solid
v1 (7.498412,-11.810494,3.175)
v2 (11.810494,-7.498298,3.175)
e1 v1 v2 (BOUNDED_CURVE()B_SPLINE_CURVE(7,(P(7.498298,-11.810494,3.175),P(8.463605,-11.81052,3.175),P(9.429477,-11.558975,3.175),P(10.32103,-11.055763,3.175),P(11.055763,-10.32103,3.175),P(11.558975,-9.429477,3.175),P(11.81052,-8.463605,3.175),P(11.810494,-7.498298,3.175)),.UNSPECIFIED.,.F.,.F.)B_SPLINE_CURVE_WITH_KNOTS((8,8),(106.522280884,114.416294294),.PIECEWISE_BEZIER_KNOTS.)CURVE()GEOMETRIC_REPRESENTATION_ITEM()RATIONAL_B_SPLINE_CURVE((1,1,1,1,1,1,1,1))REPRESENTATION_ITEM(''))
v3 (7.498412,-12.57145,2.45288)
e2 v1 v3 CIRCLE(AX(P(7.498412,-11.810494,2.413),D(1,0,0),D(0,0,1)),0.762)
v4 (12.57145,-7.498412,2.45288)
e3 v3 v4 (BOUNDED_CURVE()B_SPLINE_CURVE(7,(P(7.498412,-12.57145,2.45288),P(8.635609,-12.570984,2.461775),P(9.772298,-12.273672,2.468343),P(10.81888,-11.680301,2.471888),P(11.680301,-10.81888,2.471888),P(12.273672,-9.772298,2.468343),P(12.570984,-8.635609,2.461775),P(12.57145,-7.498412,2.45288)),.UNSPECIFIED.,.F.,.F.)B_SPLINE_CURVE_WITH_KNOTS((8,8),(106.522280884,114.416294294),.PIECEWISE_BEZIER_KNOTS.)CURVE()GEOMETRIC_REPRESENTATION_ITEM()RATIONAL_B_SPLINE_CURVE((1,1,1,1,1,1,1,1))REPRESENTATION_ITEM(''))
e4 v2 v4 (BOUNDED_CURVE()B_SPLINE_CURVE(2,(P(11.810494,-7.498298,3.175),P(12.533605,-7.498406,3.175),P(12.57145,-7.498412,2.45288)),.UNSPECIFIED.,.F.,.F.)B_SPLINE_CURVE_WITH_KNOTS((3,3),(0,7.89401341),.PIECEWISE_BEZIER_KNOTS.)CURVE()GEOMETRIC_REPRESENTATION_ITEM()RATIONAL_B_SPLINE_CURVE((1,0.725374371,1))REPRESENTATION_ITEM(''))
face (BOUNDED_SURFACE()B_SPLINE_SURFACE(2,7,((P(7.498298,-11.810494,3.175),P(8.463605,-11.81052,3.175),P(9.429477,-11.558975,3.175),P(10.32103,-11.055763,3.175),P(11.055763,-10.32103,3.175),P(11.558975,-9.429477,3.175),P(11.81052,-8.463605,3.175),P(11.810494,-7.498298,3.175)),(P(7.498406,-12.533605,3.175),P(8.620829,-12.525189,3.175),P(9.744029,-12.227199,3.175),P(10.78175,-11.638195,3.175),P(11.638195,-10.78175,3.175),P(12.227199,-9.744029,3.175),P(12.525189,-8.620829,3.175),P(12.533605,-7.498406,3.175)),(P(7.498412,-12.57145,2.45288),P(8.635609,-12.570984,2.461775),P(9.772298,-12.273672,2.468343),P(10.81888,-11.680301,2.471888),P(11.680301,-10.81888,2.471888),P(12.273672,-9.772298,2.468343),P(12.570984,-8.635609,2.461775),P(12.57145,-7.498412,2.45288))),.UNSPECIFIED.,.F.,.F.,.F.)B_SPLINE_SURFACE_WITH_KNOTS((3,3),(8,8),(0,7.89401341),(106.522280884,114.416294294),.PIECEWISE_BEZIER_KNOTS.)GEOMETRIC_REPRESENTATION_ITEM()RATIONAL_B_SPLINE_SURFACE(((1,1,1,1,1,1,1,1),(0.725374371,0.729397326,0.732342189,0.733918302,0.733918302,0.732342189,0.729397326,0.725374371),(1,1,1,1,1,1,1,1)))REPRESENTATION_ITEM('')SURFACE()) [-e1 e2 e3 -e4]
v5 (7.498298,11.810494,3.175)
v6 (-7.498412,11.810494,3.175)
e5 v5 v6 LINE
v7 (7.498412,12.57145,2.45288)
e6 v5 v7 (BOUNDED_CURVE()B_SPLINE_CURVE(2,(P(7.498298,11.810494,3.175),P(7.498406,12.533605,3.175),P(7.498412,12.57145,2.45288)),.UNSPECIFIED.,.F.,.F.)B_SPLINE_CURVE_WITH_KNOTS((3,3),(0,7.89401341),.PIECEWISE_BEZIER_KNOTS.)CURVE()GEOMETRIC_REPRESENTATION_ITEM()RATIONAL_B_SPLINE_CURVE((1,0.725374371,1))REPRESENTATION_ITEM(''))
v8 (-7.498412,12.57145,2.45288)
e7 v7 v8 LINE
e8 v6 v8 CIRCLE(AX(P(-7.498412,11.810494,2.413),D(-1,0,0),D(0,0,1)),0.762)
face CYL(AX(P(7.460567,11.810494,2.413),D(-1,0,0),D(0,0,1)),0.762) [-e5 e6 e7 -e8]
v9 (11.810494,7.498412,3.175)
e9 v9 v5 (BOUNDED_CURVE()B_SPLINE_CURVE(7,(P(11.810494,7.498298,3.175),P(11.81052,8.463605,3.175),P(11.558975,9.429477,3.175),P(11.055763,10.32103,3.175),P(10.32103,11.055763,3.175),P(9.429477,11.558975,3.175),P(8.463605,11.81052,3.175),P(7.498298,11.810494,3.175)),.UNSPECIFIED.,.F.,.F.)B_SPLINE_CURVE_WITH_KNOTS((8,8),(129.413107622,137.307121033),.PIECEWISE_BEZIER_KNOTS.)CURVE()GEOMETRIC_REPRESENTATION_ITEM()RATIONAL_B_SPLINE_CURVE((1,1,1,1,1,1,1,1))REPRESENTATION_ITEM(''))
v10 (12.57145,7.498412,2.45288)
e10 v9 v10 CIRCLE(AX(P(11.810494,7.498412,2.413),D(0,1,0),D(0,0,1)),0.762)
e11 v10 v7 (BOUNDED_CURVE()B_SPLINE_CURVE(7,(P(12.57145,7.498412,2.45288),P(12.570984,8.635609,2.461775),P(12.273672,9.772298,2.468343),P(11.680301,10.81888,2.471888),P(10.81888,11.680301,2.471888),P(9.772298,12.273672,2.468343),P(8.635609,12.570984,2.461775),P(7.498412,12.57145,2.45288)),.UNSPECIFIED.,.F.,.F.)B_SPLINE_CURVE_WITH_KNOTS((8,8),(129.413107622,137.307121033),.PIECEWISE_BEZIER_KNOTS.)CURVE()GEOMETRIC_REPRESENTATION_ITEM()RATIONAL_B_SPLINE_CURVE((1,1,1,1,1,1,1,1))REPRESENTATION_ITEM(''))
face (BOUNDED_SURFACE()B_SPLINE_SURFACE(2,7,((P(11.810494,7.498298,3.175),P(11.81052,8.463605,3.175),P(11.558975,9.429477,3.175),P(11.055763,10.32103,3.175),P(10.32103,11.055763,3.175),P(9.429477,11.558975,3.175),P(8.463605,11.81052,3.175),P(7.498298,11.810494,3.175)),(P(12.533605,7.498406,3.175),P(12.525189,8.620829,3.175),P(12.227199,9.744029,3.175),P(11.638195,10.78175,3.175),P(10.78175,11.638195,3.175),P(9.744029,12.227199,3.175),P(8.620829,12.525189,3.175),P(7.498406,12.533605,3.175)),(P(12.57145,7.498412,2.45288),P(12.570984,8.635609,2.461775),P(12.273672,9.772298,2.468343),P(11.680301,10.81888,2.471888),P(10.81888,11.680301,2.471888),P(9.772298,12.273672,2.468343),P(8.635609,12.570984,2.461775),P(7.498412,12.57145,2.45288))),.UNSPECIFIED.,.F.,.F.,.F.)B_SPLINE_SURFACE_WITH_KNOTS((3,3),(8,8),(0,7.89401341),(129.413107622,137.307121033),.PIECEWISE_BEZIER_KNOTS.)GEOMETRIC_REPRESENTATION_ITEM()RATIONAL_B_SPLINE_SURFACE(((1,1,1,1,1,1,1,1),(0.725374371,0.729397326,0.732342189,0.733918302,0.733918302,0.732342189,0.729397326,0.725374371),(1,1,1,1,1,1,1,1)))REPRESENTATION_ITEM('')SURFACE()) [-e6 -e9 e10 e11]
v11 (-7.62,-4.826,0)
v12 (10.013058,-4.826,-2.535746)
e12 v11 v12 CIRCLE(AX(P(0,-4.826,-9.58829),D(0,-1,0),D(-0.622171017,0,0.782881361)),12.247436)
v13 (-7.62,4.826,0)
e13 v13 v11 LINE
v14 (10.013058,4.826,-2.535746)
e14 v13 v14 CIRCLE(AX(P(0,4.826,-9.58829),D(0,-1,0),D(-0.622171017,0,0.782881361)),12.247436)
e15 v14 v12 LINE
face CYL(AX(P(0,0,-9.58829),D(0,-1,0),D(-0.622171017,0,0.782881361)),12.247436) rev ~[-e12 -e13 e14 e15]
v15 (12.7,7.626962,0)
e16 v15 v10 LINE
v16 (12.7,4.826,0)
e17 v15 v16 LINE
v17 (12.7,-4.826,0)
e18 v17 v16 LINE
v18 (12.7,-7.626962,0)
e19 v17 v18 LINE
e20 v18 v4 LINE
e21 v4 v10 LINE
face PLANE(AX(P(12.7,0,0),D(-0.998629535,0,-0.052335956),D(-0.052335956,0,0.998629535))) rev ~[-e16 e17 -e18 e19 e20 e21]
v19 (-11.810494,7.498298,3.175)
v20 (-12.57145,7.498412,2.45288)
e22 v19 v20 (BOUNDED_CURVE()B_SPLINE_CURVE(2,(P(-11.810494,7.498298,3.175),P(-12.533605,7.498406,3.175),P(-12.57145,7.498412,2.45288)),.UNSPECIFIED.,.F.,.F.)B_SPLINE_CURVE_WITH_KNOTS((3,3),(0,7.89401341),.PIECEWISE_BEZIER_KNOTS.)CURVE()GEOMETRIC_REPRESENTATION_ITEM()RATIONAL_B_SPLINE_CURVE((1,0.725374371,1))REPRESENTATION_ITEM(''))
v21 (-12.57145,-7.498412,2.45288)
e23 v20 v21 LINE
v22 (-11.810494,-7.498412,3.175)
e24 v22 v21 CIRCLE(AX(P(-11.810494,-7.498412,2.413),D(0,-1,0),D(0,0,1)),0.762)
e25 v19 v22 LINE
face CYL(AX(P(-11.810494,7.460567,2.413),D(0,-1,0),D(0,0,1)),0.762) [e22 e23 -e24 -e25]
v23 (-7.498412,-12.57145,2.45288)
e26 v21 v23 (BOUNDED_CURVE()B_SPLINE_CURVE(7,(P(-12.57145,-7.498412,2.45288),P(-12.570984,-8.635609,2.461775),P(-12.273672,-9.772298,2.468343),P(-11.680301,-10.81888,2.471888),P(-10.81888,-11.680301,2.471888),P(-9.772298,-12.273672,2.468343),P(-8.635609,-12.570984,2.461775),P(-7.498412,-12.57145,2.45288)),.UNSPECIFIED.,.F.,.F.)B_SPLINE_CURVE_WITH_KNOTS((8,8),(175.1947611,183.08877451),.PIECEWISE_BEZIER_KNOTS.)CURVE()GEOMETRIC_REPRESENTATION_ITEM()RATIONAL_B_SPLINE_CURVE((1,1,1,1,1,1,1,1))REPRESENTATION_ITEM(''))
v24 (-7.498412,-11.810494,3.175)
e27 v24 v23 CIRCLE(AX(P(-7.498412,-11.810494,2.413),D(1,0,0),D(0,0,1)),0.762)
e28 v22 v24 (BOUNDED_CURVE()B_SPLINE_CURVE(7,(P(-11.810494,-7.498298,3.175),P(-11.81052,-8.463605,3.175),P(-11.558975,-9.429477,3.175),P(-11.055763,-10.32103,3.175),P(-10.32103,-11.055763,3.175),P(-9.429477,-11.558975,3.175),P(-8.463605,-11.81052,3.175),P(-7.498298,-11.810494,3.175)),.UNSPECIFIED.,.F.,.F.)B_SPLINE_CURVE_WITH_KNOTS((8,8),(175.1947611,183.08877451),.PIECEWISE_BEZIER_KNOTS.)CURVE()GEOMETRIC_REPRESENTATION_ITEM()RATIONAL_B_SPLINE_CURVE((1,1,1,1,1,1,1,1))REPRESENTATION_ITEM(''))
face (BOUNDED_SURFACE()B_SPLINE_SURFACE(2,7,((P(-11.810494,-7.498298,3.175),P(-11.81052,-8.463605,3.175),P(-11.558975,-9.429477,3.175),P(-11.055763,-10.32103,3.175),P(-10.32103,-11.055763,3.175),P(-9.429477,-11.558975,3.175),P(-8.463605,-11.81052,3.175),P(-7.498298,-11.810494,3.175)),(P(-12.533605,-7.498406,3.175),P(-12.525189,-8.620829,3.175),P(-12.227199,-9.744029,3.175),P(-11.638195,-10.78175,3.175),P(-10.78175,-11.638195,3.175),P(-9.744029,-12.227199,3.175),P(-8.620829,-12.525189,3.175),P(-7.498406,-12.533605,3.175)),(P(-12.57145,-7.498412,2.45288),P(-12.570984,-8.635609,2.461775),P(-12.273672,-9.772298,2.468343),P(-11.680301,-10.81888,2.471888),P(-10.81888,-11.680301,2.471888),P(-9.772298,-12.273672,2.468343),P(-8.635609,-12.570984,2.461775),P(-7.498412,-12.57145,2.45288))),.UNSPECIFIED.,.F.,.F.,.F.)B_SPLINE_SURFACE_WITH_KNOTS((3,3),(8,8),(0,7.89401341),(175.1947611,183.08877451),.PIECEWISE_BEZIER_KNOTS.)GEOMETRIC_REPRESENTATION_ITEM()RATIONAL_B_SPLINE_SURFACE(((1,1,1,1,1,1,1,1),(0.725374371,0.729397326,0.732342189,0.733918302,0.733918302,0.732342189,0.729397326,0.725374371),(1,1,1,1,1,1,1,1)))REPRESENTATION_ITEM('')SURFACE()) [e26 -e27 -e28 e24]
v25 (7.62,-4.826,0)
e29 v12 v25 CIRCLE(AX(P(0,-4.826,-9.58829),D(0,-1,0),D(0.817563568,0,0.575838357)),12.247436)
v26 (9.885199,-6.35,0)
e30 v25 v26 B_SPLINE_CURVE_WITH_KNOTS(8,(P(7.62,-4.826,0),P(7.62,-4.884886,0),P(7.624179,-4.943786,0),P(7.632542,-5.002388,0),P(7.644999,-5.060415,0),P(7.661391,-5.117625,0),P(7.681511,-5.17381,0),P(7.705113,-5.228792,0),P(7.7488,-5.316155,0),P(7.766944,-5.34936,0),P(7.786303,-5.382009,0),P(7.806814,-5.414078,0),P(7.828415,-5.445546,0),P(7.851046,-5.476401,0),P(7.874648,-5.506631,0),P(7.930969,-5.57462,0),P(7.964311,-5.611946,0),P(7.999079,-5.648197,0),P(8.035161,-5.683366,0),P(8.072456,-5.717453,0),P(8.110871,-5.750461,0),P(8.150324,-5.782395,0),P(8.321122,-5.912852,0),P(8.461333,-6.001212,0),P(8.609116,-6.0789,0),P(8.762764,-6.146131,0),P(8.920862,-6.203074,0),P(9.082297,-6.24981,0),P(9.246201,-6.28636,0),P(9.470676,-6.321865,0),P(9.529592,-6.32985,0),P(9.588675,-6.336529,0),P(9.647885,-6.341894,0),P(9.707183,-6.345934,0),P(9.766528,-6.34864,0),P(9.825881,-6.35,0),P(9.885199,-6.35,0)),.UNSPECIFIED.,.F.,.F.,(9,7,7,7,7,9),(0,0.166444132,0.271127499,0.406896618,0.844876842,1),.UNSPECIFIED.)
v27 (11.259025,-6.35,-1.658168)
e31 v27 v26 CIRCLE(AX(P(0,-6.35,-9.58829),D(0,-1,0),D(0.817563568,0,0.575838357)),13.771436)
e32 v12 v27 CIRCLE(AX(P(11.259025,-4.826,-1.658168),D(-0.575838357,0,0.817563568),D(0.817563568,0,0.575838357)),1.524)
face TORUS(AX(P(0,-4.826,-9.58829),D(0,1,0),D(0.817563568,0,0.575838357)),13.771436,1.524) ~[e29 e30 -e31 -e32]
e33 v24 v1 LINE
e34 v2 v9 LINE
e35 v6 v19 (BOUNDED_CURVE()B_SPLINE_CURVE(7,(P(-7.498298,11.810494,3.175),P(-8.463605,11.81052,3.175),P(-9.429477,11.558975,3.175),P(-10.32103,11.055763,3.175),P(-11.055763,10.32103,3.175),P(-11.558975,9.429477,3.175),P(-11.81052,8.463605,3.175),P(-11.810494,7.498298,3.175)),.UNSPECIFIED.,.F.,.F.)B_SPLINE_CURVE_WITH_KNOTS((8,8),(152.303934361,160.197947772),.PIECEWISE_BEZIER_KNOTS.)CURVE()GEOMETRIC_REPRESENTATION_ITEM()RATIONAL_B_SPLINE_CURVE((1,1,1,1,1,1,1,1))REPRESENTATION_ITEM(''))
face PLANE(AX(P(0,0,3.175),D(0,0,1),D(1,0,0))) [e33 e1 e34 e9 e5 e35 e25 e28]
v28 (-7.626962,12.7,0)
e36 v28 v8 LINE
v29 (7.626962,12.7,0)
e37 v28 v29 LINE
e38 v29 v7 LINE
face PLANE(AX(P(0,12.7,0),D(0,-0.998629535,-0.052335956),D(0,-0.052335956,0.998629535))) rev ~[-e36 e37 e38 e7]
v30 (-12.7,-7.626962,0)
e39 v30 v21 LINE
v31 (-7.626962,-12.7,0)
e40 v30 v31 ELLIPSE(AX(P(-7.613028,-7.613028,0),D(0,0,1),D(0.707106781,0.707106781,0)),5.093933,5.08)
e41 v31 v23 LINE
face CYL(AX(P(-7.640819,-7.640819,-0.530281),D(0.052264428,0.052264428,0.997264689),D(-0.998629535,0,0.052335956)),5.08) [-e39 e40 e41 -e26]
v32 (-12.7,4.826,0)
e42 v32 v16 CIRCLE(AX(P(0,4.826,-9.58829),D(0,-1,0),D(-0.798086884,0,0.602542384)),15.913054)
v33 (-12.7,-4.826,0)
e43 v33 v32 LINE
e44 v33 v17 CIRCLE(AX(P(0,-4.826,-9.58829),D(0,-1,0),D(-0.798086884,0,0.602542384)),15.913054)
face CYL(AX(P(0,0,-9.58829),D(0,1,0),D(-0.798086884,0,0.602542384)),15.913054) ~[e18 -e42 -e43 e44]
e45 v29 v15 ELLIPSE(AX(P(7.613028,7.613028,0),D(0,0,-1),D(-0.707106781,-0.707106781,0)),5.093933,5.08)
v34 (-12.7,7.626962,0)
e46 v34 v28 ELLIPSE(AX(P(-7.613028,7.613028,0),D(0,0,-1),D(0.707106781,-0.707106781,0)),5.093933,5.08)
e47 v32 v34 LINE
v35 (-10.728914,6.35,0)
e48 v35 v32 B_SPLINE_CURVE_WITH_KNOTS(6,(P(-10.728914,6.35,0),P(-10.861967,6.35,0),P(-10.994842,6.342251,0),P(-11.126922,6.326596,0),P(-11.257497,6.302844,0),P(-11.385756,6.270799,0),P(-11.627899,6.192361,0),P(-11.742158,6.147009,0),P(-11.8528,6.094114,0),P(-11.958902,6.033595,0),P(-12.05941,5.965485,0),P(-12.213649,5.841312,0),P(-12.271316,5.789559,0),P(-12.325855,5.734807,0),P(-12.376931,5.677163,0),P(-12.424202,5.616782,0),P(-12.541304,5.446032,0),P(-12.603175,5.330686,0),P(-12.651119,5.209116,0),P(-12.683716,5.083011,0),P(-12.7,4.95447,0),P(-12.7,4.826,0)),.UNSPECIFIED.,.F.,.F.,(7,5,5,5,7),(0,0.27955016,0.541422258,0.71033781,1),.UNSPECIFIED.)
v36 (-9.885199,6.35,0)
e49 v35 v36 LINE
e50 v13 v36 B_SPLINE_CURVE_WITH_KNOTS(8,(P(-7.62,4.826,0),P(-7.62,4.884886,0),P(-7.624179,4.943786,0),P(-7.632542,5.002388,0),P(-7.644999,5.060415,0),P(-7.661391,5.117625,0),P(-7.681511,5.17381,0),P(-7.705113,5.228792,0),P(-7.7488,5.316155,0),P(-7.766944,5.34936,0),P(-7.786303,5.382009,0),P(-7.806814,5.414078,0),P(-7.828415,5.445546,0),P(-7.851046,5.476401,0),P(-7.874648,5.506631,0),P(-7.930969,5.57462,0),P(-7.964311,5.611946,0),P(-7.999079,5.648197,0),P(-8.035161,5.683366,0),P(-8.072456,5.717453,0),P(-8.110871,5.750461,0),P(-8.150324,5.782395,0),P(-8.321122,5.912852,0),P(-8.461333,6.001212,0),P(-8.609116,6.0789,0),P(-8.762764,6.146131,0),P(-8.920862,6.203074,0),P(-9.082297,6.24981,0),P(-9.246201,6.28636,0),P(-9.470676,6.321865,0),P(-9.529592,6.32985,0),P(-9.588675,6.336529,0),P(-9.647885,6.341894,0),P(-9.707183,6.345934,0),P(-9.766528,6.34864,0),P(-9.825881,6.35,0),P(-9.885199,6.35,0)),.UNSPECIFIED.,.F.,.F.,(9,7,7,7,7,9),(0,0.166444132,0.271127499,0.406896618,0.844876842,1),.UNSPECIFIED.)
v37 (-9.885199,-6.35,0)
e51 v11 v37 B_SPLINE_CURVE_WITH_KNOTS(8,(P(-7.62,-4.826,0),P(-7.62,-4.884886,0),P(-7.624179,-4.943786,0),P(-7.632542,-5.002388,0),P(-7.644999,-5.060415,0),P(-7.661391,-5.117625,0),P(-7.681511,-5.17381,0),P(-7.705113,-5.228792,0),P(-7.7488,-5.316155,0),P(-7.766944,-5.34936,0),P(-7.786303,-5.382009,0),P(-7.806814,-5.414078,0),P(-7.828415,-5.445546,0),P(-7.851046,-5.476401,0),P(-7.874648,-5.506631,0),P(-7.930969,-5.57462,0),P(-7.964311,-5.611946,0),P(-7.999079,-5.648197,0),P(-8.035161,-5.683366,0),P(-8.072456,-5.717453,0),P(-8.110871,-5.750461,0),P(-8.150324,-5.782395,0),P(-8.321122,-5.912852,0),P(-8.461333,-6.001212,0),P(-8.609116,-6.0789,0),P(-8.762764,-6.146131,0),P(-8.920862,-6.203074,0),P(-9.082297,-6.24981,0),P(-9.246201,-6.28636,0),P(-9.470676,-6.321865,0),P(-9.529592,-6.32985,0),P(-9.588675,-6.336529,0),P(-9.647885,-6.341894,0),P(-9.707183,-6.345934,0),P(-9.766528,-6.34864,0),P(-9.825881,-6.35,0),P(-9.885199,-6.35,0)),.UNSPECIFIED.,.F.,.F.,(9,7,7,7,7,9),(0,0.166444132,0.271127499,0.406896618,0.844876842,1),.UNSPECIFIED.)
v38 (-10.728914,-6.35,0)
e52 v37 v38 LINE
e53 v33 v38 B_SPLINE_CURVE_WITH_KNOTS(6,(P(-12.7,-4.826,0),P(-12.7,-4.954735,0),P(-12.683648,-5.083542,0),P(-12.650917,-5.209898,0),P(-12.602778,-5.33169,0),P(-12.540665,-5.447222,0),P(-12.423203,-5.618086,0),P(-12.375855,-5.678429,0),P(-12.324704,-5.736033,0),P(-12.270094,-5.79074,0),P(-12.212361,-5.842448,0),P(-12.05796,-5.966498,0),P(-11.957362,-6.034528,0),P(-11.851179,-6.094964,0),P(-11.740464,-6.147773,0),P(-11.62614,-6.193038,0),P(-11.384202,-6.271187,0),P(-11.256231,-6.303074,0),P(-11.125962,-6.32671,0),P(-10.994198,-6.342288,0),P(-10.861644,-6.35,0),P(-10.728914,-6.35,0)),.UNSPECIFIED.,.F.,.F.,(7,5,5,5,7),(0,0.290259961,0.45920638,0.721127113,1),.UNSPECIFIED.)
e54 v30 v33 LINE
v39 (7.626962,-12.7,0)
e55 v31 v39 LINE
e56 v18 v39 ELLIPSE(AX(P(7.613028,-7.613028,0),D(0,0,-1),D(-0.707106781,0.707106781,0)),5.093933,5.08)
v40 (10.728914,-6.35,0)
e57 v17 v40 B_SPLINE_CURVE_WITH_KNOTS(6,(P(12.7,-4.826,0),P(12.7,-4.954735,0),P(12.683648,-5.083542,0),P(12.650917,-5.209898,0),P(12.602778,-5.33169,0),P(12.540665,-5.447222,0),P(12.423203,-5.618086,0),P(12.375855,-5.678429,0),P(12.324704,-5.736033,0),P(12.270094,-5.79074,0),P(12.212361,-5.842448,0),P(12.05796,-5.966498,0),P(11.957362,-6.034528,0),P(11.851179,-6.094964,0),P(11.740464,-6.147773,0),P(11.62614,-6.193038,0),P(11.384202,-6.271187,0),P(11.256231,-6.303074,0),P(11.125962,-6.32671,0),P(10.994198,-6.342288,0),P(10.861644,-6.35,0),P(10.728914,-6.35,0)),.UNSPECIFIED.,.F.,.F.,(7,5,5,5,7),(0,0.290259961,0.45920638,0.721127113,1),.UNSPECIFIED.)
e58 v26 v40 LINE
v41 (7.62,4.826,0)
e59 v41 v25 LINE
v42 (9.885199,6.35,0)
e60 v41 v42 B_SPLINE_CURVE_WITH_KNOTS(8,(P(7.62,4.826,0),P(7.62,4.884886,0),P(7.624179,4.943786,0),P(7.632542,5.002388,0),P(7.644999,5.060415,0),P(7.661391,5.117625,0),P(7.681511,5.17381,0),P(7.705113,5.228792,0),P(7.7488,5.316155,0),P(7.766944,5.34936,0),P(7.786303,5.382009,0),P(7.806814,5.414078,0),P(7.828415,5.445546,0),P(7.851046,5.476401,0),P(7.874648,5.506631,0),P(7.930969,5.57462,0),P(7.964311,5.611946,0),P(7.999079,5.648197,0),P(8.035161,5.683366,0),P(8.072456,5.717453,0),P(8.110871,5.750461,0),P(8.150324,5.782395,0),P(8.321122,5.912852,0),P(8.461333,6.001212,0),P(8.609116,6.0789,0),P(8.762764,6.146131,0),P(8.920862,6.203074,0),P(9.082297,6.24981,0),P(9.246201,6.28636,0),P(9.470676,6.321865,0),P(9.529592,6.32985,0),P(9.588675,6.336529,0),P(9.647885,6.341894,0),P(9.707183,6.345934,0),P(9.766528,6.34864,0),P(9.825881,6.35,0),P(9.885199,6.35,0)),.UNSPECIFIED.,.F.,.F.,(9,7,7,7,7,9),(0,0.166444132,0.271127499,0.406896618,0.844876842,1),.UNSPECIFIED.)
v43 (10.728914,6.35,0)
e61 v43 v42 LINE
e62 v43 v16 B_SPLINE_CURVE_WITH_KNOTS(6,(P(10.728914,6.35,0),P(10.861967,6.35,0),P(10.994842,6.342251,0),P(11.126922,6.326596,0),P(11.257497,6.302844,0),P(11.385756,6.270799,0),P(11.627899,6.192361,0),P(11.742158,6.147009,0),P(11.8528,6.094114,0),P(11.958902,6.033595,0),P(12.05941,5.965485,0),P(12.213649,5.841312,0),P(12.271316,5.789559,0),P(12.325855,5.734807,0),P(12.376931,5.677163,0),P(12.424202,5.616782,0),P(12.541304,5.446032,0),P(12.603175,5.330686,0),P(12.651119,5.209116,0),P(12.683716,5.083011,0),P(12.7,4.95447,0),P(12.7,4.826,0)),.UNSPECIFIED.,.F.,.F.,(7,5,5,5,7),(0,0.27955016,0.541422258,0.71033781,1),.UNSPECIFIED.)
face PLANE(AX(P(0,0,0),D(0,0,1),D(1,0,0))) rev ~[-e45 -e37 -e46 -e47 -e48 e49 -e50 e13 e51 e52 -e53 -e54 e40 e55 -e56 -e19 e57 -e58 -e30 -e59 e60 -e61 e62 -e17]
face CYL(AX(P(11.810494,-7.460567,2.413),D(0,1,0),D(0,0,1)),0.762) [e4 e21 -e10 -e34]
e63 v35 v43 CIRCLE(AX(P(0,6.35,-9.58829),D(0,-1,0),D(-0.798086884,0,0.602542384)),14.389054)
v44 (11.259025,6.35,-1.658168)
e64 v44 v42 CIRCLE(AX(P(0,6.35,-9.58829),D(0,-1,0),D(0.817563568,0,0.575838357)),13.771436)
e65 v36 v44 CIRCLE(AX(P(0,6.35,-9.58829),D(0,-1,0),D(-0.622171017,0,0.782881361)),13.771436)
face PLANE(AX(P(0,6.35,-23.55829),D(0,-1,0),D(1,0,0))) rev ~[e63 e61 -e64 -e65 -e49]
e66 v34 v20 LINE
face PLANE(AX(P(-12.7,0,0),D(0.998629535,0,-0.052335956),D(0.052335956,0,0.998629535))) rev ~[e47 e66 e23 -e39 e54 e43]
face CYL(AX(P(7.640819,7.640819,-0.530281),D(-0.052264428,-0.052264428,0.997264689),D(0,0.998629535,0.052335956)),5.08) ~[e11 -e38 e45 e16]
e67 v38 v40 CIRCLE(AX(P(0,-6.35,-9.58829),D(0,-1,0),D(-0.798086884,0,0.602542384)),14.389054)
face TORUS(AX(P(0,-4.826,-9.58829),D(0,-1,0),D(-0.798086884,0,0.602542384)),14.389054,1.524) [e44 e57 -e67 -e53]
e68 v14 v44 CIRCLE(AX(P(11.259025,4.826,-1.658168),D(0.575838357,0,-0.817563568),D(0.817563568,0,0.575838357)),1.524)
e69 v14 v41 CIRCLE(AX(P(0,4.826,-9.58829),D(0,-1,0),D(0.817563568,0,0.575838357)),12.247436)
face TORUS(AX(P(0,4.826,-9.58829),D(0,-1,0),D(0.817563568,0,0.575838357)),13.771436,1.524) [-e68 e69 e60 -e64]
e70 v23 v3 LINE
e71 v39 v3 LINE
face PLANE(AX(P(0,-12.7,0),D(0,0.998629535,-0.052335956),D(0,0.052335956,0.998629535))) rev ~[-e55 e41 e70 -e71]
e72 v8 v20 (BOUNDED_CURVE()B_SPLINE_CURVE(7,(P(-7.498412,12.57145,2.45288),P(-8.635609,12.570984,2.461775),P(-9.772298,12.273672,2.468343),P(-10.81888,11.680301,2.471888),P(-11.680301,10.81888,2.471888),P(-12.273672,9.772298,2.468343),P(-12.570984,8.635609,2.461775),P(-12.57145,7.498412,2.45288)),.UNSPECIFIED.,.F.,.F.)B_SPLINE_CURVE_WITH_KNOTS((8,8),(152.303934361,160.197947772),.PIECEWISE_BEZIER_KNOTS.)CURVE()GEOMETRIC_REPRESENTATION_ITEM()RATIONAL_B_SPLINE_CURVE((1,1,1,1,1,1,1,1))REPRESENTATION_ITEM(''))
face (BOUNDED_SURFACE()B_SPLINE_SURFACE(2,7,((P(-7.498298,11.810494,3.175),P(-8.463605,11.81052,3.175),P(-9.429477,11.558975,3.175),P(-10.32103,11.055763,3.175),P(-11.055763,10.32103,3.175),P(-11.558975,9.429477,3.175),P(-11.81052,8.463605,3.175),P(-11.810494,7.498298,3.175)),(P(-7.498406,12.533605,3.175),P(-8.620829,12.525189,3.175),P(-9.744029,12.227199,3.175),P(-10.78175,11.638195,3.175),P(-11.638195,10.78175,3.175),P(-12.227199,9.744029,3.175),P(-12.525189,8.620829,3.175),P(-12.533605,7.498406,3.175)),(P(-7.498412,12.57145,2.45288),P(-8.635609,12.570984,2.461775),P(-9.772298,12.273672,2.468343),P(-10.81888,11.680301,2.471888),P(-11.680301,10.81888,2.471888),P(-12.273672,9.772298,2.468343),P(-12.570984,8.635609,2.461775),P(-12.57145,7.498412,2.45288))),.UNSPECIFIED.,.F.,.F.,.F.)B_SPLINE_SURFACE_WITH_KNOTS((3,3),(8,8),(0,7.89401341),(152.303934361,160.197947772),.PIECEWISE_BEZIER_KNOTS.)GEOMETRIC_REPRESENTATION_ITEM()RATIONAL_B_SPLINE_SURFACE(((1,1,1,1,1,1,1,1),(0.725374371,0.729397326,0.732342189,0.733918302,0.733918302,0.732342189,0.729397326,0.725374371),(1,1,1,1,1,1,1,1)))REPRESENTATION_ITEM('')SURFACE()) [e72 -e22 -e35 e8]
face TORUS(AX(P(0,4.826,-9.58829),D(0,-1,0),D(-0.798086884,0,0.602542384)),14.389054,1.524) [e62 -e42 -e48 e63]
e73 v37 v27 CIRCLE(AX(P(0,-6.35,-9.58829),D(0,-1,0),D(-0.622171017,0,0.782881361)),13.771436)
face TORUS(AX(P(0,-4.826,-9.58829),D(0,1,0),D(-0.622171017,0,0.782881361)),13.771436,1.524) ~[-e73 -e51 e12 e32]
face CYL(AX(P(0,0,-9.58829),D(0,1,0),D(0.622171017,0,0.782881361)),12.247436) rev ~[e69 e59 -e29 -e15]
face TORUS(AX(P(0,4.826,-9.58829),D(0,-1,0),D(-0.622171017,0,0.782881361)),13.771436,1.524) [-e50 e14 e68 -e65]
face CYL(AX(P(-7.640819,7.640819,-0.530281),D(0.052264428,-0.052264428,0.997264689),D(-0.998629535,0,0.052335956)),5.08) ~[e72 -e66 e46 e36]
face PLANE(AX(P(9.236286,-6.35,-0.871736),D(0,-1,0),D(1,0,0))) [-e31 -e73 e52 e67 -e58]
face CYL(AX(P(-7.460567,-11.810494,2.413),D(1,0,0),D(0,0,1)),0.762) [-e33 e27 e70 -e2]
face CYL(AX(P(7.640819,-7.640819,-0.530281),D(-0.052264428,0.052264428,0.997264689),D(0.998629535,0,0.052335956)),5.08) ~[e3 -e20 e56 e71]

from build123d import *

# Parameters (mm, degrees)
F0_W          = 25.4
F0_H          = 25.4
F1_DEPTH      = 3.175
F1_TAPER      = 3
F3_W          = 5.08
F3_H          = 12.7
F6_DEPTH      = 6.35
F6_DEPTH_BACK = 6.35
F7_R          = 5.08
F8_R          = 1.524
F9_R          = 0.762


with BuildPart() as f1:
    # F0 (on Top) → F1 (new body)
    with BuildSketch(Plane.XY):
        Rectangle(F0_W, F0_H)
    extrude(amount=F1_DEPTH, taper=F1_TAPER)

    # F4: sweep along a path in F2
    with BuildLine(Plane.XZ) as f4_path:
        ThreePointArc((-10.16, 0), (0, -23.5582897328), (10.16, 0))
    # F3 (on face) → F4 (sweep)
    with BuildSketch(Plane(origin=(0, 0, 0), x_dir=(1, 0, 0), z_dir=(0, 0, -1))):
        with Locations((-10.16, 0)):
            Rectangle(F3_W, F3_H)
    sweep(path=f4_path.line)

    # F5 (on Front) → F6 (join, two sides)
    with BuildSketch(Plane.XZ) as f6_sk:
        with BuildLine():
            Line((10.0130578512, -2.535746045), (10.16, 0))
            Line((10.16, 0), (7.62, 0))
            ThreePointArc((7.62, 0), (8.9072265211, -1.1822790439), (10.0130578512, -2.535746045))
        make_face()
    extrude(amount=F6_DEPTH)
    extrude(f6_sk.sketch, amount=-F6_DEPTH_BACK)

    # F7
    f7_edges = [f1.edges().sort_by_distance(p)[0] for p in [
        (-12.616803, 12.616803, 1.5875),
        (12.616803, 12.616803, 1.5875),
        (12.616803, -12.616803, 1.5875),
        (-12.616803, -12.616803, 1.5875),
    ]]
    fillet(f7_edges, radius=F7_R)

    # F8
    f8_edges = [f1.edges().sort_by_distance(p)[0] for p in [
        (-1.743325, -6.35, -21.711017),
        (8.907227, -6.35, -1.182279),
        (-1.743325, 6.35, -21.711017),
        (0, -6.35, -25.501344),
        (0, 6.35, -25.501344),
        (8.907227, 6.35, -1.182279),
    ]]
    fillet(f8_edges, radius=F8_R)

    # F9
    f9_edges = [f1.edges().sort_by_distance(p)[0] for p in [
        (0, -12.533605, 3.175),
        (-11.048589, -11.048589, 3.175),
        (11.048589, -11.048589, 3.175),
        (-12.533605, 0, 3.175),
        (12.533605, 0, 3.175),
        (-11.048589, 11.048589, 3.175),
        (11.048589, 11.048589, 3.175),
        (0, 12.533605, 3.175),
    ]]
    fillet(f9_edges, radius=F9_R)


solid = f1.part
